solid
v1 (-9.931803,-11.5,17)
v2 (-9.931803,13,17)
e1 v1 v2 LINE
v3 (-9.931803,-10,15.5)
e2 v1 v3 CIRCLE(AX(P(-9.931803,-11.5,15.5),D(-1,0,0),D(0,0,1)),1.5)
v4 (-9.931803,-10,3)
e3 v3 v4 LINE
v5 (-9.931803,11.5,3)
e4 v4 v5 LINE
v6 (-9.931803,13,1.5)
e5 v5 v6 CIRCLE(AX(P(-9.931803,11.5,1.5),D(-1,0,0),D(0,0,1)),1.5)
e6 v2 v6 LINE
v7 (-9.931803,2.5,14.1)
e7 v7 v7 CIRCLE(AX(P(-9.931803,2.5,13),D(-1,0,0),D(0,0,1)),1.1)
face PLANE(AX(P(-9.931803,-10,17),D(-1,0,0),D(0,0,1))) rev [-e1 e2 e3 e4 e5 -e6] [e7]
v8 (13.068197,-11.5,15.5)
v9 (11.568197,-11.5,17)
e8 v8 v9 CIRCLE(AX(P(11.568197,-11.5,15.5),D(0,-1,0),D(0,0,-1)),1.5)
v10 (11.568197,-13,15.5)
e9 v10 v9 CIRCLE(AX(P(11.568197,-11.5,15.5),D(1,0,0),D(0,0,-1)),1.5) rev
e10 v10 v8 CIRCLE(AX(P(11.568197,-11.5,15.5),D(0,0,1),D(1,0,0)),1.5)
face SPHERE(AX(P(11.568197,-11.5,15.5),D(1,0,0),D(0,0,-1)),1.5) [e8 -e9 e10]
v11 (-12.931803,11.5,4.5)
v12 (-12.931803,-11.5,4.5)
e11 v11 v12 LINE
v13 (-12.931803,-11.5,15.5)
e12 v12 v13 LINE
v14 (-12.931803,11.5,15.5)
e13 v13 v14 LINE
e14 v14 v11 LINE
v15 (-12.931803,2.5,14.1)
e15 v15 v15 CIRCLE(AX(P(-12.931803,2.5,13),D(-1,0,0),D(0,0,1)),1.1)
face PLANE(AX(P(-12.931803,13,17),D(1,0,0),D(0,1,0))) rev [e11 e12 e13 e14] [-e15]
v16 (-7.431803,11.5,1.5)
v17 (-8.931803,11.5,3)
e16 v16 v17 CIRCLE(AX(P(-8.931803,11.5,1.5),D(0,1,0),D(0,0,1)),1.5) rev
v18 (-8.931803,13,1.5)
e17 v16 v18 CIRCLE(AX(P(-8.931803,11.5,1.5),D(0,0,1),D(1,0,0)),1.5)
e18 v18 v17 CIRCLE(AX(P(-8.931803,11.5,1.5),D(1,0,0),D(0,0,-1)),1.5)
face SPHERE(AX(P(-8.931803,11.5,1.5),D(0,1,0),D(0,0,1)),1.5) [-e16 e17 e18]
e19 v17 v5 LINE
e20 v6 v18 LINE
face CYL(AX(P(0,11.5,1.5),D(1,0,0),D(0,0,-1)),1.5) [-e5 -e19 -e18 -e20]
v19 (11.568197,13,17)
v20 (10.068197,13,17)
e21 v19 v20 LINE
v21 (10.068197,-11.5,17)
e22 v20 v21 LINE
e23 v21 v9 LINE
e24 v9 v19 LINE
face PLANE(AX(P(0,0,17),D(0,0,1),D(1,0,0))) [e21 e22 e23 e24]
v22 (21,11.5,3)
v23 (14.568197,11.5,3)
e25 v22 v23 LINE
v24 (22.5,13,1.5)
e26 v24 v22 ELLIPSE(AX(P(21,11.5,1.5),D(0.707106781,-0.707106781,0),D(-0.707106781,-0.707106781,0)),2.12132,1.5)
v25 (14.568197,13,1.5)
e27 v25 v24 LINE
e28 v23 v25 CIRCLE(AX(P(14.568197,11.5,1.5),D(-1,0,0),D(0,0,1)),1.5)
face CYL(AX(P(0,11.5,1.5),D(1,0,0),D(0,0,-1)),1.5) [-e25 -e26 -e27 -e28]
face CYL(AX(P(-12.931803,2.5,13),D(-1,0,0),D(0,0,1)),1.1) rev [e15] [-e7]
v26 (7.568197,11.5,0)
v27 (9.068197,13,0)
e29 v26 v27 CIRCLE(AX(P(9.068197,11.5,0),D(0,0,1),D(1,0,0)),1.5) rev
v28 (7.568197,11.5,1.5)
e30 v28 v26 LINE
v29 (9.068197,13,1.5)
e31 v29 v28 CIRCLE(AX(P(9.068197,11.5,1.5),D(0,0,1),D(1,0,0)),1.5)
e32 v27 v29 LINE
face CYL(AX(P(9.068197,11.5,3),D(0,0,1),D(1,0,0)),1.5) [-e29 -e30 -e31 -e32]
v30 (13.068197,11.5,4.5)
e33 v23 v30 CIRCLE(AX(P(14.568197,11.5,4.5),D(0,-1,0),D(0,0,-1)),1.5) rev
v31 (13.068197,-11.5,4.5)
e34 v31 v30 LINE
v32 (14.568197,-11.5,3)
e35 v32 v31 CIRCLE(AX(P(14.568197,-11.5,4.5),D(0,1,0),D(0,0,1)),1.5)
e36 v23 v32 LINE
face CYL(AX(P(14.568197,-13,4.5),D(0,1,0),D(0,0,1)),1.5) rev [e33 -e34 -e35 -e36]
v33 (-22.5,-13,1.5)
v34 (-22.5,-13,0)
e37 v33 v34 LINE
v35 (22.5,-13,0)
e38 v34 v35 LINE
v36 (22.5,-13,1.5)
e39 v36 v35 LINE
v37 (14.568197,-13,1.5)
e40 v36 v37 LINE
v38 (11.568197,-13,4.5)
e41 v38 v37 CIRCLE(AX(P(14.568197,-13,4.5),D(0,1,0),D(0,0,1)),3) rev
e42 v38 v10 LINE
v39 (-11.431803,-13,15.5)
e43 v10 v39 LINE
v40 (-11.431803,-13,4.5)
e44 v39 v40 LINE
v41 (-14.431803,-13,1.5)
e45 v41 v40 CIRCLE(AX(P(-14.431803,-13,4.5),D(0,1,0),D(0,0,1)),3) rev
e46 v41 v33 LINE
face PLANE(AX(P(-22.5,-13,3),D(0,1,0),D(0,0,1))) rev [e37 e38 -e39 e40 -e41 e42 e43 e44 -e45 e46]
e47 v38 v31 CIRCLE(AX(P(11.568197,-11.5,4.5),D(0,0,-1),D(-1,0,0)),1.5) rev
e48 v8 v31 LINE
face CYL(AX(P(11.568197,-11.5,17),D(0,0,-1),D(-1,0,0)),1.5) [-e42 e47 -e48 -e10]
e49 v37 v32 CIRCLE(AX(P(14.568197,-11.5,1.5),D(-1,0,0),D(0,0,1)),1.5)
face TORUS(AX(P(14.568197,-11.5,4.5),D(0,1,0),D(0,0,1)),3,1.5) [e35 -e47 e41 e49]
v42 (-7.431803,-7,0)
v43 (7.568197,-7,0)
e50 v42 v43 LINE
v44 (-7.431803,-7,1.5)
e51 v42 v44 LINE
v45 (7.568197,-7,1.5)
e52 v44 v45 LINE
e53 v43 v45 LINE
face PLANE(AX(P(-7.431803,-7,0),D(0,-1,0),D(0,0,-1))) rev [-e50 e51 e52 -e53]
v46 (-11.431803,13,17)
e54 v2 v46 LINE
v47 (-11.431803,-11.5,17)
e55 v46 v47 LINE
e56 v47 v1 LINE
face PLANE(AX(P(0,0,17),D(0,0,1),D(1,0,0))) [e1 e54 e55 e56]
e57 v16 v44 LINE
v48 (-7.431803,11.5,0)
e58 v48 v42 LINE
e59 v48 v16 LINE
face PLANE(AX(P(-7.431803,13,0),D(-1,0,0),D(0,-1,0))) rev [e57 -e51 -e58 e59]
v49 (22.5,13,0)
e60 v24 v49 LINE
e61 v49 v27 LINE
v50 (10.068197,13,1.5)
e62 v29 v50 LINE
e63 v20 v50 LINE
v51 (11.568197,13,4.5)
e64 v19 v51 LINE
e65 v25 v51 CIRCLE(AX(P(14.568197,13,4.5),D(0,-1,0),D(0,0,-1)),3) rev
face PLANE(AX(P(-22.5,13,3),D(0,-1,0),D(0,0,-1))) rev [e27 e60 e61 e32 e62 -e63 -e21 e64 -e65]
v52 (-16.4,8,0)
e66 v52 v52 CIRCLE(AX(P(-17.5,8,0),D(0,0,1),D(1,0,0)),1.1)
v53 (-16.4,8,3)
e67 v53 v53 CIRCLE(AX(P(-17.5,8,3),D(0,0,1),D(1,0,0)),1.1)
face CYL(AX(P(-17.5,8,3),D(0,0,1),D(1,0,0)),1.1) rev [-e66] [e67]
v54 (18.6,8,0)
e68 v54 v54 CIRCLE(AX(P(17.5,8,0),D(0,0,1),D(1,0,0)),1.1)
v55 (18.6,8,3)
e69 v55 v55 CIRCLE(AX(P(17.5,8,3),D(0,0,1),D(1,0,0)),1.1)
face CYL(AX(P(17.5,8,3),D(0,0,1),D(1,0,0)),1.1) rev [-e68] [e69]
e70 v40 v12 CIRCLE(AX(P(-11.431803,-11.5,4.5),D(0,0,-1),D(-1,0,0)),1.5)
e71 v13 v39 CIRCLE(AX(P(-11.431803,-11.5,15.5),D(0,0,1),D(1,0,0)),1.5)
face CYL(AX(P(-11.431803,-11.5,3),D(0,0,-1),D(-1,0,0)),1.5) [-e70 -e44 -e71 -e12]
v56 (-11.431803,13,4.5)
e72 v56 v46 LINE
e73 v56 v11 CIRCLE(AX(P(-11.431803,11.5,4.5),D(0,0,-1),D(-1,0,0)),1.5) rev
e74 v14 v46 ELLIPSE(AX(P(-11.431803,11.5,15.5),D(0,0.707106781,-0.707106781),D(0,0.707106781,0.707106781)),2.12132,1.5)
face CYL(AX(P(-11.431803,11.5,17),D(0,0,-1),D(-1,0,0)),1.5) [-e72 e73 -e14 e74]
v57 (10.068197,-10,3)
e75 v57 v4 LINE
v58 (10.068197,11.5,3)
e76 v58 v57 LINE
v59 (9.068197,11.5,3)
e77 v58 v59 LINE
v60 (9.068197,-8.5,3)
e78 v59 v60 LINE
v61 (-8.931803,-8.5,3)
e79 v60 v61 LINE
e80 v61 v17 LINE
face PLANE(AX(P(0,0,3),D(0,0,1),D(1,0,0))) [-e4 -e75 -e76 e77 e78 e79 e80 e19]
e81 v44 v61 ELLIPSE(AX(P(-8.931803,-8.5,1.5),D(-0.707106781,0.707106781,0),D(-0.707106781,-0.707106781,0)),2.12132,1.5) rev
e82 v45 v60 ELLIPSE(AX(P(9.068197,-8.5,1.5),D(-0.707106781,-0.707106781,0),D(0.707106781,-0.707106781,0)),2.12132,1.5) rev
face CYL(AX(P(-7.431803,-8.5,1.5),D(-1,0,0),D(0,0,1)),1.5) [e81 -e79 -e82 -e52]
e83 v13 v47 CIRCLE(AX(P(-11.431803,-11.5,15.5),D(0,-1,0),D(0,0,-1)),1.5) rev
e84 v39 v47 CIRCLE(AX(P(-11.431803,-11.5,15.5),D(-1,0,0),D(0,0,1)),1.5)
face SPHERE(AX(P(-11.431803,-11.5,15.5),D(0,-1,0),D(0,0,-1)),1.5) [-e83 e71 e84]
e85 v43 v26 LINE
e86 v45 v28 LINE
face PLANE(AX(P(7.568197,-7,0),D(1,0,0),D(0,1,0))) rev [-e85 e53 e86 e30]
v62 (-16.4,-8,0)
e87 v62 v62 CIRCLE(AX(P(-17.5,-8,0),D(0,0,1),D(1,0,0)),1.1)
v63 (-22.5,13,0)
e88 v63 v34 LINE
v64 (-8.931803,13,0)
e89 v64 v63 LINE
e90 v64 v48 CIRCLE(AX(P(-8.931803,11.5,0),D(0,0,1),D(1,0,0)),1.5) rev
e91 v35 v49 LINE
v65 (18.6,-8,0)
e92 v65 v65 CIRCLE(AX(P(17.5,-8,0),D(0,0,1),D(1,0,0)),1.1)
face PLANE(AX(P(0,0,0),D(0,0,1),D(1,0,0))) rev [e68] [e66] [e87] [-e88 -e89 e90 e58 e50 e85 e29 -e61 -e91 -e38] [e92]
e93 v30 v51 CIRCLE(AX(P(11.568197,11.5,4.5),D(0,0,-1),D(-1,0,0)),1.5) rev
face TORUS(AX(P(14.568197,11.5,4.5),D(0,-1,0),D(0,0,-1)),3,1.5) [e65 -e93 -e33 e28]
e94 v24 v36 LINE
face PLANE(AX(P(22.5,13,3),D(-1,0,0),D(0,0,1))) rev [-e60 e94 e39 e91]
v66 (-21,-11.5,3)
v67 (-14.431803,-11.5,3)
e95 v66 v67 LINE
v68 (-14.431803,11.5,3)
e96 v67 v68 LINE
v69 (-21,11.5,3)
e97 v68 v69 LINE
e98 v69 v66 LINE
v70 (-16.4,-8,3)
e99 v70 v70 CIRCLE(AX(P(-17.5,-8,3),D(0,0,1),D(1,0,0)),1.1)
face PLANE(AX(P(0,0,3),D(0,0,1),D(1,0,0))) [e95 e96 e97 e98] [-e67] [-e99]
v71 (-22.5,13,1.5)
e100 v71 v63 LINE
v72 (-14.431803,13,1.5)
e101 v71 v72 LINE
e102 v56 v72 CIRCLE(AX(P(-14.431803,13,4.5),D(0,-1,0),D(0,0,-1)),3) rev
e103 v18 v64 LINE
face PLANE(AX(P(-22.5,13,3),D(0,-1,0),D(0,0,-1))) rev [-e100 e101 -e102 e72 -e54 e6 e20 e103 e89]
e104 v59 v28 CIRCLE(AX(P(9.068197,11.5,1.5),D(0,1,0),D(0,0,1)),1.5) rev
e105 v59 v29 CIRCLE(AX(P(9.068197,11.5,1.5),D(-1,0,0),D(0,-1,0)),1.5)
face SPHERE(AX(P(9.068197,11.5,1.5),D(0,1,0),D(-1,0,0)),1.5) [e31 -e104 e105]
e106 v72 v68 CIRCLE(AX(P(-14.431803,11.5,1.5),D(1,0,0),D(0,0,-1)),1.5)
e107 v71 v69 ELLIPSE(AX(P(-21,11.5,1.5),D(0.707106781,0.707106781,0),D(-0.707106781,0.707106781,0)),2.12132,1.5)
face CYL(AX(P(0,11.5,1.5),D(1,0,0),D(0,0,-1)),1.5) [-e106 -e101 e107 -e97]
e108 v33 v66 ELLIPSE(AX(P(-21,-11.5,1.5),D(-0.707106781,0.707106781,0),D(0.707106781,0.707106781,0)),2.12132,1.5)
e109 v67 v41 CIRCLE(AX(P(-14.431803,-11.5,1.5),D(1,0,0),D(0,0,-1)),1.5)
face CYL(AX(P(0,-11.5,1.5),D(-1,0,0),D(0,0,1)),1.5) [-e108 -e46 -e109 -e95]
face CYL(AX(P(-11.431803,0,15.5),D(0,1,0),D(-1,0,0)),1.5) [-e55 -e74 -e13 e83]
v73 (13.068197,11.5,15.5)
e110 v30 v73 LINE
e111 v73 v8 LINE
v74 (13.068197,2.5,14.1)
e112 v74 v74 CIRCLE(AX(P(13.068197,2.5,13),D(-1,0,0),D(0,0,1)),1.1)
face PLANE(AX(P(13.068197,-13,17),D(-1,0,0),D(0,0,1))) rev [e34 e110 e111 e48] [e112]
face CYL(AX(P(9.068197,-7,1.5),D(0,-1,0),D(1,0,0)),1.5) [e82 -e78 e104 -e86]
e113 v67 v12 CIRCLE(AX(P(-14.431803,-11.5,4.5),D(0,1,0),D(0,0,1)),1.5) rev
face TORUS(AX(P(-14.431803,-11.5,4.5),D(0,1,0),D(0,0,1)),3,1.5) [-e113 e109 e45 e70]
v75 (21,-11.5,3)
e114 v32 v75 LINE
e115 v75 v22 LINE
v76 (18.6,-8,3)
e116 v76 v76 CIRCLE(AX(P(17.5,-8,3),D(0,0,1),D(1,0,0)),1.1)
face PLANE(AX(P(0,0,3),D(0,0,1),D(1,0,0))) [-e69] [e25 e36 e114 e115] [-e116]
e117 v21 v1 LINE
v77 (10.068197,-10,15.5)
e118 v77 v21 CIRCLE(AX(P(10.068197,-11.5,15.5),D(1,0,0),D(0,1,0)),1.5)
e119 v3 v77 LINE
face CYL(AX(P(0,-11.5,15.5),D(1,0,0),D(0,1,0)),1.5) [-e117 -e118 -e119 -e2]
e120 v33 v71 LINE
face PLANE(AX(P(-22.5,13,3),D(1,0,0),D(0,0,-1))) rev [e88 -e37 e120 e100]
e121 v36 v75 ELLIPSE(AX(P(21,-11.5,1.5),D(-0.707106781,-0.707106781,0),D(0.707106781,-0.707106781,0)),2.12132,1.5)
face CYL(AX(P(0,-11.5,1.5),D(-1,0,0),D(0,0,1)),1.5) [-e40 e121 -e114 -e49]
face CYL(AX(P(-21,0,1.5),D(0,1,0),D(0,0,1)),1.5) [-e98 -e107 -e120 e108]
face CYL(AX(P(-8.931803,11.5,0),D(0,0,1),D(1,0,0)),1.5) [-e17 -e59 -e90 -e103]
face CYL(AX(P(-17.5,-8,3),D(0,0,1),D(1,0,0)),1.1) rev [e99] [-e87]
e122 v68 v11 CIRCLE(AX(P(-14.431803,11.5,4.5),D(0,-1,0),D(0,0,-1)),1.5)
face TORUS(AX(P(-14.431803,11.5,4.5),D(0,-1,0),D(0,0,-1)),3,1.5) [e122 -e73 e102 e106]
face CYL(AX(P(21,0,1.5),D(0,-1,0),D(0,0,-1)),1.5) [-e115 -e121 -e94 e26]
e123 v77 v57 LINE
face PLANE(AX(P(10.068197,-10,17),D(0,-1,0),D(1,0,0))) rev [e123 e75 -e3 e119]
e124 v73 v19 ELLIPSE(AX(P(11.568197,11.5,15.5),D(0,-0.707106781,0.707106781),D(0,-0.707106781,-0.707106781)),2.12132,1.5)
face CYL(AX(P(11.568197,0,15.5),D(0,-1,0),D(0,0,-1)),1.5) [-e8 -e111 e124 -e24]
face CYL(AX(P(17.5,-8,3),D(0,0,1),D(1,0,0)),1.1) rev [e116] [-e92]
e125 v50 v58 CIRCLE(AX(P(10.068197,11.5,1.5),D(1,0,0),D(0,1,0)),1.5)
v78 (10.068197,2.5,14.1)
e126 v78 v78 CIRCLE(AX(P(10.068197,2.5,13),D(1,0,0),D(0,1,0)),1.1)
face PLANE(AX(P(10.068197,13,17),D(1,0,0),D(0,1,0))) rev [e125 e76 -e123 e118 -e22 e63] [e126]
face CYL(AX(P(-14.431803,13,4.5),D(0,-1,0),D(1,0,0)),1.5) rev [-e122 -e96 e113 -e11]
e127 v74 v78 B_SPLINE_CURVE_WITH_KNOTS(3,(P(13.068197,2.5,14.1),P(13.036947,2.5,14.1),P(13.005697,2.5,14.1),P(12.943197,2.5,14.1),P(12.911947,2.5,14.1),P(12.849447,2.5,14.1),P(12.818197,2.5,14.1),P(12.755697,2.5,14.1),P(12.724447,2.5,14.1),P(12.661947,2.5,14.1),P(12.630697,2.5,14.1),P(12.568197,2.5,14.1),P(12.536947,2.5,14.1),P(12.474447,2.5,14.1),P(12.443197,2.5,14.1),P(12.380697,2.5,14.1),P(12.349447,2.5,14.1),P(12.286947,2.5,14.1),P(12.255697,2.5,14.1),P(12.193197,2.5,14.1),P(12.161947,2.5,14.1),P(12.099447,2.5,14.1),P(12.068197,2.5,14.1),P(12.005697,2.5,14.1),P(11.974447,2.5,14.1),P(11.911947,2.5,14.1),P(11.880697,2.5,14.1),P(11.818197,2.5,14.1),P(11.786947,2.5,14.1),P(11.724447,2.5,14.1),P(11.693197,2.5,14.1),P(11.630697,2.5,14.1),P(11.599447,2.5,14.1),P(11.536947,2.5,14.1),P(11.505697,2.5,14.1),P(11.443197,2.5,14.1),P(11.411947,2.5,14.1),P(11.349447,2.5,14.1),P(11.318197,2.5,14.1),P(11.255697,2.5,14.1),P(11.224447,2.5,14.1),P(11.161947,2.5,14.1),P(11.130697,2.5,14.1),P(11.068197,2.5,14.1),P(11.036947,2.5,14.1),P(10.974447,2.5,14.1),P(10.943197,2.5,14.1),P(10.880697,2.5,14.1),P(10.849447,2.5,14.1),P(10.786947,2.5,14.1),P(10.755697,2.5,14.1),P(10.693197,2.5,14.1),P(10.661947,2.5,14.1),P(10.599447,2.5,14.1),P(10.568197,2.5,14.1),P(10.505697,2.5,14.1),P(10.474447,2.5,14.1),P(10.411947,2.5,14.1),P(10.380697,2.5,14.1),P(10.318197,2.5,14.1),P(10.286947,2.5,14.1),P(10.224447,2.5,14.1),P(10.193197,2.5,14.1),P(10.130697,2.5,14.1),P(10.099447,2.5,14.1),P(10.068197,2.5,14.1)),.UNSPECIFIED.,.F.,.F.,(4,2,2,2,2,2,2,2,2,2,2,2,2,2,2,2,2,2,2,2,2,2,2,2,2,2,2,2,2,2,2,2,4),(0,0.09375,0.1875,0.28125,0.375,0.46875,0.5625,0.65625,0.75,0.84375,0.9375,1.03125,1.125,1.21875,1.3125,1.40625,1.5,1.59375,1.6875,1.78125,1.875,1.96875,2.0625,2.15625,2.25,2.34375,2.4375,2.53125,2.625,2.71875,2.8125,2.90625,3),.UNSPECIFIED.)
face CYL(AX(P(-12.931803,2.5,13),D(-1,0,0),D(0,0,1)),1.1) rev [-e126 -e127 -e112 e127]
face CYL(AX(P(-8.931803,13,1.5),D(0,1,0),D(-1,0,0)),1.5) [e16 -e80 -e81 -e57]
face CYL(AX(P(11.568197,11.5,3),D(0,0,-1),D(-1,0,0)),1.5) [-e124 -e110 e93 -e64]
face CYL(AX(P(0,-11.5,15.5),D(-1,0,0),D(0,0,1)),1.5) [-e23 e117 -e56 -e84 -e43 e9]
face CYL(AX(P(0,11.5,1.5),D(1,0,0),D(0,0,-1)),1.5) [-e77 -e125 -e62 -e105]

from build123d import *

# Parameters (mm, degrees)
SKETCH1_W                    = 45
SKETCH1_H                    = 26
BOSS_EXTRUDE5_DEPTH          = 3
BOSS_EXTRUDE6_DEPTH          = 14
CUT_EXTRUDE1_DEPTH           = 30.516944286
CUT_EXTRUDE1_DEPTH_BACK      = 30.516944286
SKETCH9_W                    = 15
SKETCH9_H                    = 20
M2_CLEARANCE_HOLE2_OUTLINE_R = 1.1
M2_CLEARANCE_HOLE2_DEPTH     = 3
M2_CLEARANCE_HOLE3_D         = 2.2
FILLET1_R                    = 1.5
FILLET2_R                    = 1.5


# Read off the part's stored shape, not the designer's step: M2 Clearance Hole2
with BuildPart() as part:
    # Sketch1 → Boss-Extrude5 (new body)
    with BuildSketch(Plane.XY):
        Rectangle(SKETCH1_W, SKETCH1_H)
    extrude(amount=BOSS_EXTRUDE5_DEPTH)

    # Sketch8 → Boss-Extrude6 (add)
    with BuildSketch(Plane.XY.offset(3)):
        Polygon((-9.931802589, -10), (-9.931802589, 13), (-12.931802589, 13), (-12.931802589, -13), (13.068197411, -13), (13.068197411, 13), (10.068197411, 13), (10.068197411, -10), align=None)
    extrude(amount=BOSS_EXTRUDE6_DEPTH)

    # Sketch9 → Cut-Extrude1 (cut, two sides: drawn at the far end of the back side and taken through both)
    with BuildSketch(Plane.XY.offset(3).offset(-CUT_EXTRUDE1_DEPTH_BACK)):
        with Locations((0.068197411, 3)):
            Rectangle(SKETCH9_W, SKETCH9_H)
    extrude(amount=CUT_EXTRUDE1_DEPTH + CUT_EXTRUDE1_DEPTH_BACK, mode=Mode.SUBTRACT)

    # M2 Clearance Hole2 outline → M2 Clearance Hole2 (cut)
    with BuildSketch(Plane.XY):
        with Locations((17.5, 8)):
            Circle(M2_CLEARANCE_HOLE2_OUTLINE_R)
        with Locations((-17.5, -8)):
            Circle(M2_CLEARANCE_HOLE2_OUTLINE_R)
        with Locations((-17.5, 8)):
            Circle(M2_CLEARANCE_HOLE2_OUTLINE_R)
        with Locations((17.5, -8)):
            Circle(M2_CLEARANCE_HOLE2_OUTLINE_R)
    extrude(amount=M2_CLEARANCE_HOLE2_DEPTH, mode=Mode.SUBTRACT)

    # M2 Clearance Hole3 (through all)
    with Locations(Plane.ZY.offset(12.931802589)):
        with Locations((13, 2.5)):
            Hole(M2_CLEARANCE_HOLE3_D / 2)

    # Fillet1
    fillet1_edges = [part.edges().sort_by_distance(p)[0] for p in [
        (-22.5, 0, 3),
        (-17.715901295, 13, 3),
        (17.784098705, -13, 3),
        (-17.715901295, -13, 3),
        (-12.931802589, 0, 3),
        (-12.931802589, 13, 10),
        (-12.931802589, -13, 10),
        (13.068197411, 0, 3),
        (13.068197411, -13, 10),
        (13.068197411, 13, 10),
        (-12.931802589, 0, 17),
        (0.068197411, -13, 17),
        (13.068197411, 0, 17),
        (0.068197411, -10, 17),
        (22.5, 0, 3),
        (17.784098705, 13, 3),
    ]]
    fillet(fillet1_edges, radius=FILLET1_R - 0.0001)  # a hair under: the kernel refuses the full size

    # Fillet2
    fillet2_edges = [part.edges().sort_by_distance(p)[0] for p in [
        (8.818197411, 13, 3),
        (-8.681802589, 13, 3),
        (7.568197411, 3, 3),
        (0.068197411, -7, 3),
        (-7.431802589, 3, 3),
        (-7.431802589, 13, 1.5),
        (7.568197411, 13, 1.5),
    ]]
    fillet(fillet2_edges, radius=FILLET2_R)


solid = part.part
